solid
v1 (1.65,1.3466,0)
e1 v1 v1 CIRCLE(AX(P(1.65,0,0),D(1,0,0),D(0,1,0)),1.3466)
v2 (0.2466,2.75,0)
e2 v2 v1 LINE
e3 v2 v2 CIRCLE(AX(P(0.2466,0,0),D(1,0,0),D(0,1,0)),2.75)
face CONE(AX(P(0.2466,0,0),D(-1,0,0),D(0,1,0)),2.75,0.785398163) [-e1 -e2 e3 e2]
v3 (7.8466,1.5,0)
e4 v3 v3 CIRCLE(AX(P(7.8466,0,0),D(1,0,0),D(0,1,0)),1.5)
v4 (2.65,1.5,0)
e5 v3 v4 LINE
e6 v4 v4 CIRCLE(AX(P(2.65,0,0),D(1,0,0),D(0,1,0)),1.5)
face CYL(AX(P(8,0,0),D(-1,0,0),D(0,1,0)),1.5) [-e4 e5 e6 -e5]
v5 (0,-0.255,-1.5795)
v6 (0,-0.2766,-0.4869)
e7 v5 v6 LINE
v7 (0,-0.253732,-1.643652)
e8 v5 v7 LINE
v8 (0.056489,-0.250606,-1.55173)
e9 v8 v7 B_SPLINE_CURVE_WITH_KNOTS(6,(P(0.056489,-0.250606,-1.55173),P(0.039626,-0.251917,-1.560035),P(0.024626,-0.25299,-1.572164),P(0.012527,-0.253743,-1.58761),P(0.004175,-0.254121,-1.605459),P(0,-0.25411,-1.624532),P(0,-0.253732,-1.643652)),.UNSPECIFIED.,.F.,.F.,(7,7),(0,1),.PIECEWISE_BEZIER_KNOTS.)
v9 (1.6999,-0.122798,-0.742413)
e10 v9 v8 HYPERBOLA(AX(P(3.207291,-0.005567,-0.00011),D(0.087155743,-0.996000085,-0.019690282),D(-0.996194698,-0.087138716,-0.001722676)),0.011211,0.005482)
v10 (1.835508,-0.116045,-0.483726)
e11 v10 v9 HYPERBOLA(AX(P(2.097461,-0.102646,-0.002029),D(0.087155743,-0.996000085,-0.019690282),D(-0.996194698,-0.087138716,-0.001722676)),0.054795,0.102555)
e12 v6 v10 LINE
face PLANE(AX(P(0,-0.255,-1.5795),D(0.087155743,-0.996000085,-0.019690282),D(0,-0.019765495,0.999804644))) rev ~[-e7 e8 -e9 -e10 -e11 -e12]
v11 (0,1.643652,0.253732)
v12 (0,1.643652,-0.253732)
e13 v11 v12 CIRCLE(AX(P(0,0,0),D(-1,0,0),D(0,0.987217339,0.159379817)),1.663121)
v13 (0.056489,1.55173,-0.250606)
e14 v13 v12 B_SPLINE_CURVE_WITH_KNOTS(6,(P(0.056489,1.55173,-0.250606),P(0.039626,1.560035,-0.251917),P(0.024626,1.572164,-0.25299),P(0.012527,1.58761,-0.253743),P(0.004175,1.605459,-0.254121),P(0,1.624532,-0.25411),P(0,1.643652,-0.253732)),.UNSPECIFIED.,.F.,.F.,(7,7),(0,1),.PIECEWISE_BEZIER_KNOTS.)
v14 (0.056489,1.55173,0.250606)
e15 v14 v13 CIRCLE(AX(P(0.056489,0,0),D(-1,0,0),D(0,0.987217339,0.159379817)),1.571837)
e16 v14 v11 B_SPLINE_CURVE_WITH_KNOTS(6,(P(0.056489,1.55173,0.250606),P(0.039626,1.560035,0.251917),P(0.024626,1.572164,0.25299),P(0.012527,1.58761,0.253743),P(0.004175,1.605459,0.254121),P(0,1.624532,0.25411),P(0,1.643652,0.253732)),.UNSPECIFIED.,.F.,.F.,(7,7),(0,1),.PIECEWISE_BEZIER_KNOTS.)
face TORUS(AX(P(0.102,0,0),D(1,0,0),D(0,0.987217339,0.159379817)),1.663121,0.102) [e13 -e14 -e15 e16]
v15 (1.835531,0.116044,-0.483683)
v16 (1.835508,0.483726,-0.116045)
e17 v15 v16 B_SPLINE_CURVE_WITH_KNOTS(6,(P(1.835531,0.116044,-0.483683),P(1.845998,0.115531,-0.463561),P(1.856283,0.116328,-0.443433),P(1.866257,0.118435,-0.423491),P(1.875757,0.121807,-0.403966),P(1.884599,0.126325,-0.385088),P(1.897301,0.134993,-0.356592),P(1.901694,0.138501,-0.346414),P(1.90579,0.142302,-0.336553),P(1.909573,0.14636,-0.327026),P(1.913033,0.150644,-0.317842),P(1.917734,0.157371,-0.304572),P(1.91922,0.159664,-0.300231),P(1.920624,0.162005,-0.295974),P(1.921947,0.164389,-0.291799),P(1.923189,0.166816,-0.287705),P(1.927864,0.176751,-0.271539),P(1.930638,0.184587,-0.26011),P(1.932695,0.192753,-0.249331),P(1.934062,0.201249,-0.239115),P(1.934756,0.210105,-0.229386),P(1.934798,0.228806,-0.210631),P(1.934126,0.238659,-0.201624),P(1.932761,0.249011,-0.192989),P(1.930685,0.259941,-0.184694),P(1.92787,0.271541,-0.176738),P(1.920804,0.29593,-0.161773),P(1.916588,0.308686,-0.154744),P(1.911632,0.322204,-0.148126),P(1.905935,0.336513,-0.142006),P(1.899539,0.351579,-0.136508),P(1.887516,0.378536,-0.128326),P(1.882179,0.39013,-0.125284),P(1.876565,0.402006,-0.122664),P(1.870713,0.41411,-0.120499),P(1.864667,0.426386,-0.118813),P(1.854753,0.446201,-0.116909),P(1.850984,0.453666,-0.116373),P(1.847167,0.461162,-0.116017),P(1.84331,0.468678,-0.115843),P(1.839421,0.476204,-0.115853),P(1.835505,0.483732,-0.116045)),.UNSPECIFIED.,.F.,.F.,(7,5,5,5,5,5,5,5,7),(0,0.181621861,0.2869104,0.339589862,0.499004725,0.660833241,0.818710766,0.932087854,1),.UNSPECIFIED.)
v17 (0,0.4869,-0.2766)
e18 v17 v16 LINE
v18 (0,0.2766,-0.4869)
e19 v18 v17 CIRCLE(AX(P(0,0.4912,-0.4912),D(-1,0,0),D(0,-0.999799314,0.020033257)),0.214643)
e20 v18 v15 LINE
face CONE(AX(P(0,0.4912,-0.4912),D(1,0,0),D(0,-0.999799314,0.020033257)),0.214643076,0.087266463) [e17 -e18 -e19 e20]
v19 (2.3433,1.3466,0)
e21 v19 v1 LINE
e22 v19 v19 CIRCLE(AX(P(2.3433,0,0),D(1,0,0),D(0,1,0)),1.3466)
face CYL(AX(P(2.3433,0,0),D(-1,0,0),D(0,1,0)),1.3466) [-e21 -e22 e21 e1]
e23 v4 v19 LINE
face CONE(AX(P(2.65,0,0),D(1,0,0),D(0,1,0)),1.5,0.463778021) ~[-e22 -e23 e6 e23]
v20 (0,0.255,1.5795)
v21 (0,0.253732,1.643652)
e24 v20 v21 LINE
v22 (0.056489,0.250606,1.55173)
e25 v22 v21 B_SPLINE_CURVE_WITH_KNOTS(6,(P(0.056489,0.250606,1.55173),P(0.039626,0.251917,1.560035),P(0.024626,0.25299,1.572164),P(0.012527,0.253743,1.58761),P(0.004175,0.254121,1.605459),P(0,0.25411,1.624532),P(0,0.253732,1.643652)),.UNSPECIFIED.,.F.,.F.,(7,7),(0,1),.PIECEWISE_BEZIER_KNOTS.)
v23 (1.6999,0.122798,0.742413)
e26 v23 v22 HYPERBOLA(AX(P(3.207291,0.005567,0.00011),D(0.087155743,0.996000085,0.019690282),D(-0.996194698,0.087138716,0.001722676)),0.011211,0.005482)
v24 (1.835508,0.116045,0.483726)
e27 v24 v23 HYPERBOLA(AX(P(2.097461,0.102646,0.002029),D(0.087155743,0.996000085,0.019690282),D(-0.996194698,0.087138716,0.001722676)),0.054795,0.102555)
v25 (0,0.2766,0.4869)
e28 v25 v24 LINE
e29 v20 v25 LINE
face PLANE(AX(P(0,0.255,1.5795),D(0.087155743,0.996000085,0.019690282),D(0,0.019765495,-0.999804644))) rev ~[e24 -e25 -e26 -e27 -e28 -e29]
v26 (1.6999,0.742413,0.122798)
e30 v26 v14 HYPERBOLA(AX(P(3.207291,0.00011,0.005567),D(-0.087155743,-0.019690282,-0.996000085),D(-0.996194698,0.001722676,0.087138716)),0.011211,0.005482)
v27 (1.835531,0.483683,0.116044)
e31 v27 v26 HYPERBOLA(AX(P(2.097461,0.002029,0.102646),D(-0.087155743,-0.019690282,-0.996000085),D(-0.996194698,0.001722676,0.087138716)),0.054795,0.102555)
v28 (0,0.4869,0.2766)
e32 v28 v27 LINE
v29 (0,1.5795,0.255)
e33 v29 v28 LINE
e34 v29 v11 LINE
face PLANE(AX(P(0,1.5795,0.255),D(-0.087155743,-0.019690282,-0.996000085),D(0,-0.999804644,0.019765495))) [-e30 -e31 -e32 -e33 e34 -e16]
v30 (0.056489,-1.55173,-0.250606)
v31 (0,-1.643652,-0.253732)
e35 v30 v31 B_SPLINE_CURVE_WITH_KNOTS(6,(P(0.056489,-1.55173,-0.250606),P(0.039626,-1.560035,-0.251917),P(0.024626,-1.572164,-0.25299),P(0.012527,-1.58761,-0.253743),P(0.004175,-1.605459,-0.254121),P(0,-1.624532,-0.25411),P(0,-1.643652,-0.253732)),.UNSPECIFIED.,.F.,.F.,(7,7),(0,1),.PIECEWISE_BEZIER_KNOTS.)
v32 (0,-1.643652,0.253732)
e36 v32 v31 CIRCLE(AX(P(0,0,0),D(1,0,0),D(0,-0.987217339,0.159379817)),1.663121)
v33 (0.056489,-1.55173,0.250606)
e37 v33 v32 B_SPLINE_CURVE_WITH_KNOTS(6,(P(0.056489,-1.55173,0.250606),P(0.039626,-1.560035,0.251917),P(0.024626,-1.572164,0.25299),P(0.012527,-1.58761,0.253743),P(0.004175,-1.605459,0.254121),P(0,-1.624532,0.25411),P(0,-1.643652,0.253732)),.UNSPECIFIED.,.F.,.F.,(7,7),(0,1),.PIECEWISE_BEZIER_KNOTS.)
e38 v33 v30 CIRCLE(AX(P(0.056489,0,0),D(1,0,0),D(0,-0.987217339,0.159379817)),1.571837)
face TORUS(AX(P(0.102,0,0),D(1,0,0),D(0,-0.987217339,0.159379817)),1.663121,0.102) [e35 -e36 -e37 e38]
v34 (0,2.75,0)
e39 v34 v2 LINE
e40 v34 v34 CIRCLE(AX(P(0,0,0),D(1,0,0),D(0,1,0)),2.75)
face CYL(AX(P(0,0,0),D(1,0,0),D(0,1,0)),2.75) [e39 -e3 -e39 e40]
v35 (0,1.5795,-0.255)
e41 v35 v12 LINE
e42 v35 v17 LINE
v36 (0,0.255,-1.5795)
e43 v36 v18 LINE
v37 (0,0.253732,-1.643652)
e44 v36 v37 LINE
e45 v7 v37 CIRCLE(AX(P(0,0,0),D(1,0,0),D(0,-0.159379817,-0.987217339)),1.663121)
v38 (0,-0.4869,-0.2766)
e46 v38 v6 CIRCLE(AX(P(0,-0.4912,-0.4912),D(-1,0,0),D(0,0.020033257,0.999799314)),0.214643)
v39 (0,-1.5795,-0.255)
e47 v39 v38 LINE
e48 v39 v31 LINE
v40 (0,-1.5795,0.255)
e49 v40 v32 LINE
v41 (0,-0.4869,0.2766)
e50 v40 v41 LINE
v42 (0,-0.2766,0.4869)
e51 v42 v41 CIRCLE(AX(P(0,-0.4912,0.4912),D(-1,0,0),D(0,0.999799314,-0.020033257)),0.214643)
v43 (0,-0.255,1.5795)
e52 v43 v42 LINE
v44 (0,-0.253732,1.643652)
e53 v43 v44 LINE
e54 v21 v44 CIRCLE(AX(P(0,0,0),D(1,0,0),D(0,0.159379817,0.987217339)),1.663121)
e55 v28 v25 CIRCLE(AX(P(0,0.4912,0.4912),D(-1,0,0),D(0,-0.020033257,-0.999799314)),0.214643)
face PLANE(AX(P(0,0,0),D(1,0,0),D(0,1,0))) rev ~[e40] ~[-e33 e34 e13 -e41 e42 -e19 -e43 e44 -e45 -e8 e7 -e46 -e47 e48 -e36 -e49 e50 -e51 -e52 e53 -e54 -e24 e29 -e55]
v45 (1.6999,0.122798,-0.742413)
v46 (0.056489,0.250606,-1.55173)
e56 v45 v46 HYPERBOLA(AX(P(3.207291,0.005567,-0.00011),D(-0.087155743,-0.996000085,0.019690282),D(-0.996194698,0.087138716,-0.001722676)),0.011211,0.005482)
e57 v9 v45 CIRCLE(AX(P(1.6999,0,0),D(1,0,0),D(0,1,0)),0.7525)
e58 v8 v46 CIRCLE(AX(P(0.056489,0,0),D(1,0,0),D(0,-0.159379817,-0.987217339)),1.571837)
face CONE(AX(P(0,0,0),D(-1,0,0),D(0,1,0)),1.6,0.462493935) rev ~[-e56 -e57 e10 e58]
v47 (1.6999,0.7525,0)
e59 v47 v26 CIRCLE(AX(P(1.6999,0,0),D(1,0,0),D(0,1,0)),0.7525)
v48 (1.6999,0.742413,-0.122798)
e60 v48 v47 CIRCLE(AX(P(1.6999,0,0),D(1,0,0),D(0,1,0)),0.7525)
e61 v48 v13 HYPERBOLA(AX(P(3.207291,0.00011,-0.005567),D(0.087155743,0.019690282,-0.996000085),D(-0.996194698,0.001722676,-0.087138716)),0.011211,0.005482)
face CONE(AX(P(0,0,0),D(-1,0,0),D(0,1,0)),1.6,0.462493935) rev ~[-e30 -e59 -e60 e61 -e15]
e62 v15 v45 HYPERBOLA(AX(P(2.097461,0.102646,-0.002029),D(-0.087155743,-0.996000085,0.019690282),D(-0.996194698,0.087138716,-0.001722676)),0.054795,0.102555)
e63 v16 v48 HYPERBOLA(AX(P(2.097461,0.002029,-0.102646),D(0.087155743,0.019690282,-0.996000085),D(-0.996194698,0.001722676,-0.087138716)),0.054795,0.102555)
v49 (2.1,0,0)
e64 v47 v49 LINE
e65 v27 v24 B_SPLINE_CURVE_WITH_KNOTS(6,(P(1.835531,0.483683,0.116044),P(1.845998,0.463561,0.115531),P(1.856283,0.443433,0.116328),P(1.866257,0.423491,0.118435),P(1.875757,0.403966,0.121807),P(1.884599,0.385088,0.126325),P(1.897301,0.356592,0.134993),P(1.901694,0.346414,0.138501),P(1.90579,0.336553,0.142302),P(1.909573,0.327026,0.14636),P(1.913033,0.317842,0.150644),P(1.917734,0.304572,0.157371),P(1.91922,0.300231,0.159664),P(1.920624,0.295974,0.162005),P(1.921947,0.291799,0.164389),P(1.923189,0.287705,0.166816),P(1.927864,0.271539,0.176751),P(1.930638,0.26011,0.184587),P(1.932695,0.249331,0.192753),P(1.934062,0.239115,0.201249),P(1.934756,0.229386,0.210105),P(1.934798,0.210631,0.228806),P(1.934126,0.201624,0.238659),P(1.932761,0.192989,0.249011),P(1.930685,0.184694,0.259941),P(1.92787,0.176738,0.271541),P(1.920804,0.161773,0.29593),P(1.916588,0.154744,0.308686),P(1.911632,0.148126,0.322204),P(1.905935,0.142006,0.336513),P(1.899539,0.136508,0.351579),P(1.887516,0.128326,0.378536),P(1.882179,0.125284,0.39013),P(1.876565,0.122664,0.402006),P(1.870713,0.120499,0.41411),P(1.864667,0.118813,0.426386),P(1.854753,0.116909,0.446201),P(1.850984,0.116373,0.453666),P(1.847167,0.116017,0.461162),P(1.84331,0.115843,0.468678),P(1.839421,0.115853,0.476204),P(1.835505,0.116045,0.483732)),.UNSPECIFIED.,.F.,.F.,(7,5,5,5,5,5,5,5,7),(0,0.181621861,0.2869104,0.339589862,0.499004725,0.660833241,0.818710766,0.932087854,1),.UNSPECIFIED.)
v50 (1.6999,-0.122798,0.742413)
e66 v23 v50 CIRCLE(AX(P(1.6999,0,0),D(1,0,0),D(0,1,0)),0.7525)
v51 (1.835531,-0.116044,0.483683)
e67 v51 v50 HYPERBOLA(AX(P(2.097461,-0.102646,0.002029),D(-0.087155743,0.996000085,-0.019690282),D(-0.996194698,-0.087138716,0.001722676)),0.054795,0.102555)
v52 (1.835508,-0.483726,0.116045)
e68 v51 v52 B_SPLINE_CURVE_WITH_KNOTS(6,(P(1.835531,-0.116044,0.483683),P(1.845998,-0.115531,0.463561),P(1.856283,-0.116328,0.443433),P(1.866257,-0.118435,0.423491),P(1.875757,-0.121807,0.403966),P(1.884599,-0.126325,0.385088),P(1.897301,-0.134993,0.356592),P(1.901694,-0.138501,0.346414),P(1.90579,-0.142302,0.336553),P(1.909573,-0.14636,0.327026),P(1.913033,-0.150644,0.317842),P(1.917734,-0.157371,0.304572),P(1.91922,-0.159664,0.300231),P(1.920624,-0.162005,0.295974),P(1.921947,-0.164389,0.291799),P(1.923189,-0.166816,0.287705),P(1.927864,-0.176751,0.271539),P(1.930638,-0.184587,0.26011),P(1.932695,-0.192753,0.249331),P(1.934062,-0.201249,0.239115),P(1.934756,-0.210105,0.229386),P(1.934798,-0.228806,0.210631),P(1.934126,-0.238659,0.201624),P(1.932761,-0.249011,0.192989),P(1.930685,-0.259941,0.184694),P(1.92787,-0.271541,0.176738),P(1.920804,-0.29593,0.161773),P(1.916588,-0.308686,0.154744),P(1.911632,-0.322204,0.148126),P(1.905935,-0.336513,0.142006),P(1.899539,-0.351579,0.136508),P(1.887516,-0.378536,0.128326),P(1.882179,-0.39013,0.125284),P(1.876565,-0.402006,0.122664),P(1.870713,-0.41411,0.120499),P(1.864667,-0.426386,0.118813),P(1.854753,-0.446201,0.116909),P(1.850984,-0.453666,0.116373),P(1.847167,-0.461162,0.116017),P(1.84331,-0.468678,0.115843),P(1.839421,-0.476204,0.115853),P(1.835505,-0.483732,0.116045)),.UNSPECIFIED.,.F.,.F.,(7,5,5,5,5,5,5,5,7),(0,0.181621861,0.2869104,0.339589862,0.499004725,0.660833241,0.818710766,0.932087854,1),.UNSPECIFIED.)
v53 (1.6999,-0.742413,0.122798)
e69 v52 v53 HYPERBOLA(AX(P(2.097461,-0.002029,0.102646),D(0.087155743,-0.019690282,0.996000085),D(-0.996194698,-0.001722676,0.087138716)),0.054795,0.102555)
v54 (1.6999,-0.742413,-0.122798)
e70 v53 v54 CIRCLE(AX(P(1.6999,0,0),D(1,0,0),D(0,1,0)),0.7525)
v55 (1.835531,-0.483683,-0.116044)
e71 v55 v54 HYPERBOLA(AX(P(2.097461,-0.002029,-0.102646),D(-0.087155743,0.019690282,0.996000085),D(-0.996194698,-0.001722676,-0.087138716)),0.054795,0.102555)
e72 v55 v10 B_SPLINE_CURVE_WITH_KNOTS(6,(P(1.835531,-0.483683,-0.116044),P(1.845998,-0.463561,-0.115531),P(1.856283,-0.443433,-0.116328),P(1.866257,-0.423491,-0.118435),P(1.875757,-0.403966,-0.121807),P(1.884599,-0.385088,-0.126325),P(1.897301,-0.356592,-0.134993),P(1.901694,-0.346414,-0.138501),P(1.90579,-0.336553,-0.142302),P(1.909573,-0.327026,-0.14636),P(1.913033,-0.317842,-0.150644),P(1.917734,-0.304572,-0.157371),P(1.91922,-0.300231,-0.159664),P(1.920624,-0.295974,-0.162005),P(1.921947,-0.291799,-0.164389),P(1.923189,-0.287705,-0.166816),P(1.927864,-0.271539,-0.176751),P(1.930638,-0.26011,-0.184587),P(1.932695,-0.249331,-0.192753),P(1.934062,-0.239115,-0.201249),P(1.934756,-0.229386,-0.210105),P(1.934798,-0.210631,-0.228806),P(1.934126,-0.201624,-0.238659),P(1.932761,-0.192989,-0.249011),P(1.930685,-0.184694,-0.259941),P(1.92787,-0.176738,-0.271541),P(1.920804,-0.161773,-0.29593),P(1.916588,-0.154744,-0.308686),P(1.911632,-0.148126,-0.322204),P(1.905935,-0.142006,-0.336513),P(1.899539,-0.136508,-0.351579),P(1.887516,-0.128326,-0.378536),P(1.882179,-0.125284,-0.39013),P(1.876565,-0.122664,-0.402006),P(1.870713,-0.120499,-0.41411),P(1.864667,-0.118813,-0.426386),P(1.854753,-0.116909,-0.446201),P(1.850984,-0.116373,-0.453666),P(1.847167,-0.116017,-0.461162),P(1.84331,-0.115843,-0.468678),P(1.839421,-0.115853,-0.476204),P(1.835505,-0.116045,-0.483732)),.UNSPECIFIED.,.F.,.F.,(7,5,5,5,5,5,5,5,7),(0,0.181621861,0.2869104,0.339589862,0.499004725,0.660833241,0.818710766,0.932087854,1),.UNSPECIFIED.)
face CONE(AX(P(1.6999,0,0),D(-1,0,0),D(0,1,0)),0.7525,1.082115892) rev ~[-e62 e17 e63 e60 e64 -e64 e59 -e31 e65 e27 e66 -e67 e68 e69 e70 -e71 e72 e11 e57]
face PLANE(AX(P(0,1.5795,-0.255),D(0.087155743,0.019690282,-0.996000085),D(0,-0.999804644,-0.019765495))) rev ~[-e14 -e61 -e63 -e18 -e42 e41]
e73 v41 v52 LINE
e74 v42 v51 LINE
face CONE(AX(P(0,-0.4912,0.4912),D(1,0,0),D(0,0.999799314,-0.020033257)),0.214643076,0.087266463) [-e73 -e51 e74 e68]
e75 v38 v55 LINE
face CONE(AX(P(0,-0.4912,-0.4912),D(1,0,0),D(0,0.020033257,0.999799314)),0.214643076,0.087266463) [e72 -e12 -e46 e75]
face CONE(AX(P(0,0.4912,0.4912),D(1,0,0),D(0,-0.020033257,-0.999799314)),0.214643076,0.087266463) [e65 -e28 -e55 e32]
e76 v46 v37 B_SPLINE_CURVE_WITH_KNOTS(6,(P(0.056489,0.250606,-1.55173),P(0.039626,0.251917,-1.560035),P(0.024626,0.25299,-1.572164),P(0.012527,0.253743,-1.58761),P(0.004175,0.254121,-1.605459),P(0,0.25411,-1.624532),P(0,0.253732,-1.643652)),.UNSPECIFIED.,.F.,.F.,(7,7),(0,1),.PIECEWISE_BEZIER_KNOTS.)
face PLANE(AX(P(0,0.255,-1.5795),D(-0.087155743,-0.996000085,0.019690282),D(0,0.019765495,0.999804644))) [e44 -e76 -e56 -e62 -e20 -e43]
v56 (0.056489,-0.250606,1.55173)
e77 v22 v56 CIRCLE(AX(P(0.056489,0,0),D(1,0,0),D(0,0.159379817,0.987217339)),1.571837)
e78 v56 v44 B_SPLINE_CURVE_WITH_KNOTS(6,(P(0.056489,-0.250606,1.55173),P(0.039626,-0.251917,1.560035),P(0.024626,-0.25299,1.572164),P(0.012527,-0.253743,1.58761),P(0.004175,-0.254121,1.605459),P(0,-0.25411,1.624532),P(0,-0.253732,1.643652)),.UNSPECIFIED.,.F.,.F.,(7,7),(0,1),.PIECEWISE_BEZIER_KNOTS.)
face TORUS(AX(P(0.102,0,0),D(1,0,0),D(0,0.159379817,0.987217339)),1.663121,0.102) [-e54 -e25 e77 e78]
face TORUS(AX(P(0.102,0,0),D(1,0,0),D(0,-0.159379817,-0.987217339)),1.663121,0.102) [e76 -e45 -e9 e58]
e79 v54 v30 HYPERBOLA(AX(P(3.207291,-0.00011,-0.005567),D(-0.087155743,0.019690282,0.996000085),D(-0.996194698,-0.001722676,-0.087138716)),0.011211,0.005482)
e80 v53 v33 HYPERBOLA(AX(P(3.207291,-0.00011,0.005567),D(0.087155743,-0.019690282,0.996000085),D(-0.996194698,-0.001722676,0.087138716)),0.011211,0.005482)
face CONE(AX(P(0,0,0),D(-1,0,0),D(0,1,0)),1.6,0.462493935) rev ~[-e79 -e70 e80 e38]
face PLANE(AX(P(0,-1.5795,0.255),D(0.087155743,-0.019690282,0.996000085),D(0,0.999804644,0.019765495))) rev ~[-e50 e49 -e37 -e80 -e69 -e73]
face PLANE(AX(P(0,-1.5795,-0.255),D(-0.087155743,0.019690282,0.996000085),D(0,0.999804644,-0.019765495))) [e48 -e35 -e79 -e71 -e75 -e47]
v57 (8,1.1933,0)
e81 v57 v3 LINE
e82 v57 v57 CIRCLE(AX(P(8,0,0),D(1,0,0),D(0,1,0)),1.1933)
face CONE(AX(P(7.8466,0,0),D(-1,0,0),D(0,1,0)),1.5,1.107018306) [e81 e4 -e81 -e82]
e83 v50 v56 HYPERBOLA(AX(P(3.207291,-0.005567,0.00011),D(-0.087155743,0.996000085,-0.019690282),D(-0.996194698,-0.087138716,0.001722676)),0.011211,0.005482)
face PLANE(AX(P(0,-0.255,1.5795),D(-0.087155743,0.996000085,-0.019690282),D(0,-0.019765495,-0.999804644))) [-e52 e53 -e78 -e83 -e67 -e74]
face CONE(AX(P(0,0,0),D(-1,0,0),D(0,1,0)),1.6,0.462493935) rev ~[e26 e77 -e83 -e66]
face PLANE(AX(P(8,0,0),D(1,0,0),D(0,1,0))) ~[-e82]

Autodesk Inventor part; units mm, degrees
ref_plane "YZ Plane" through (0, 0, 0) normal (1, 0, 0) x (0, 1, 0)
ref_plane "XZ Plane" through (0, 0, 0) normal (0, 1, 0) x (-1, 0, 0)
sketch "Esquisse1" plane through (0, 0, 0) normal (0, 0, 1) x (1, 0, 0)
  line L0 (2.1, 0) -> (8, 0)
  line L1 (8, 0) -> (8, 1.5)
  line L2 (8, 1.5) -> (2.65, 1.5)
  line L3 (2.65, 1.5) -> (2.3433, 1.3466)
  line L4 (2.3433, 1.3466) -> (1.65, 1.3466)
  line L5 (0, 2.75) -> (0, 1.6)
  line L6 (0, 1.6) -> (1.6999, 0.7525)
  line L7 (1.6999, 0.7525) -> (2.1, 0)
  line L8 (-1.6, 0) -> (9.6, 0) projected
  line L9 (0, -0.55) -> (0, 3.3) projected
  line L10 (0, 2.75) -> (0.2466, 2.75)
  line L11 (0.2466, 2.75) -> (1.65, 1.3466)
  line L12 (2.65, 1.5) -> (1.4966, 1.5) construction
  dimension "d1" = 5.35
  dimension "d2" = 3
  dimension "d3" = 2.6933
  dimension "d4" = 3.2
  dimension "d5" = 26.5
  dimension "d6" = 62
  dimension "d7" = 2.1
  dimension "d8" = 0.3067
  dimension "d12" = 5.5
  dimension "d13" = 45
  dimension "d15" = 8
  dimension "d24" = 1.65
revolve "Corps" add sketch "Esquisse1" angle 360 about axis through (2.1, 0, 0) along (1, 0, 0) contours L7 L6 L5 L10 L11 L4 L3 L2 L1 L0
sketch "Esquisse2" plane through (0, 0, 0) normal (-1, 0, 0) x (0, 0, 1)
  line L0 (0, 1.6) -> (0, 0) construction
  line L1 (0, 0) -> (1.6, 0) construction
  arc A0 (0.48, 0) -> (0, 0.48) centre (0, 0) ccw construction
  arc A1 (0.56, 0) -> (0, 0.56) centre (0, 0) ccw construction
  arc A2 (1.5795, 0.255) -> (0.255, 1.5795) centre (0, 0) ccw
  line L2 (0, 0) -> (1.1314, 1.1314) construction
  line L3 (0.255, 1.5795) -> (0.2766, 0.4869)
  line L4 (1.5795, 0.255) -> (0.4869, 0.2766)
  arc A3 (0.255, 1.5795) -> (0, 1.6) centre (0, 0) ccw
  arc A4 (1.6, 0) -> (1.5795, 0.255) centre (0, 0) ccw
  line L5 (0, -3.85) -> (0, 3.85) projected
  line L6 (-3.85, 0) -> (3.85, 0) projected
  arc A5 (0.255, -1.5795) -> (1.5795, -0.255) centre (0, 0) ccw
  line L7 (0.255, -1.5795) -> (0.2766, -0.4869)
  line L8 (1.5795, -0.255) -> (0.4869, -0.2766)
  arc A6 (0, -1.6) -> (0.255, -1.5795) centre (0, 0) ccw
  arc A7 (1.5795, -0.255) -> (1.6, 0) centre (0, 0) ccw
  arc A8 (-0.255, 1.5795) -> (-1.5795, 0.255) centre (0, 0) ccw
  line L9 (-0.255, 1.5795) -> (-0.2766, 0.4869)
  line L10 (-1.5795, 0.255) -> (-0.4869, 0.2766)
  arc A9 (0, 1.6) -> (-0.255, 1.5795) centre (0, 0) ccw
  arc A10 (-1.5795, 0.255) -> (-1.6, 0) centre (0, 0) ccw
  arc A11 (-0.255, -1.5795) -> (0, -1.6) centre (0, 0) ccw
  arc A12 (-1.5795, -0.255) -> (-0.255, -1.5795) centre (0, 0) ccw
  arc A13 (-1.6, 0) -> (-1.5795, -0.255) centre (0, 0) ccw
  line L11 (-1.5795, -0.255) -> (-0.4869, -0.2766)
  line L12 (-0.255, -1.5795) -> (-0.2766, -0.4869)
  arc A14 (0.2766, 0.4869) -> (0.4869, 0.2766) centre (0.4912, 0.4912) ccw
  arc A15 (0.4869, -0.2766) -> (0.2766, -0.4869) centre (0.4912, -0.4912) ccw
  arc A16 (-0.4869, 0.2766) -> (-0.2766, 0.4869) centre (-0.4912, 0.4912) ccw
  arc A17 (-0.2766, -0.4869) -> (-0.4869, -0.2766) centre (-0.4912, -0.4912) ccw
  point P0 (1.1314, -1.1314)
  point P1 (-1.1314, 1.1314)
  point P2 (-1.1314, -1.1314)
  dimension "d17" = 0.96
  dimension "d18" = 1.12
  dimension "d19" = 3.2
  dimension "d20" = 45
  dimension "d21" = 0.255
extrude "Rainure" add sketch "Esquisse2" against normal up to next draft 5 contours L4 A14 L3 A2 | A5 L7 A15 L8 | L9 A16 L10 A8 | A12 L11 A17 L12
fillet "Congé1" radius 0.102 4 edges at (0, 1.6, 0) (0, 0, -1.6) (0, -1.6, 0) (0, 0, 1.6)
thread "Filetage" size "M3x0.5" class "6g" standard "ISO Metric profile" length 5.35
chamfer "Chanfrein1" distance 0.3067 distance2 0.1534 1 edges at (8, -1.5, 0) measured on face at (8, 0.3888, 0.4512)
ref_plane "Work Plane2" through (3.35, 0, 0) normal (0, 0, -1) x (1, 0, 0)
equation "\"d1\" = GEL"
equation "\"d2\" = GD"
equation "\"d3\" = BDM"
equation "\"d4\" = SDM"
equation "\"d7\" = INTI"
equation "\"d8\" = GAL"
equation "\"d12\" = KOD"
equation "\"d13\" = 0.5 * SEWI"
equation "\"d15\" = NLG"
equation "\"d24\" = KOH"
equation "\"d17\" = 0.3 * SDM"
equation "\"d18\" = 0.35 * SDM"
equation "\"d19\" = SDM"
equation "\"d21\" = 0.5 * SBR"
equation "\"d23\" = 0.2 * SBR"
equation "\"d10\" = GEL"
equation "\"d25\" = -0.5 * SPD + 0.5 * GD"
equation "\"d26\" = 0.5 * GAL"
equation "\"NLG\" = 8"
equation "\"GEL\" = 5.35"
equation "\"GAL\" = 0.61345 * PTC"
equation "\"SPD\" = NND - 1.2269 * PTC"
equation "\"KOD\" = 5.5"
equation "\"KOH\" = 1.65"
equation "\"SBR\" = 0.51"
equation "\"INTI\" = 2.1"
equation "\"SDM\" = 3.2"
equation "\"GD\" = NND"
equation "\"BDM\" = NND - GAL"
equation "\"SEWI\" = 90deg"
equation "\"d9\" = SDM"
equation "\"GUL\" = 0.61345 * PTC"
equation "\"TOA\" = 30deg"
equation "\"EPV\" = 3.15"
equation "\"THREADDIA\" = 3"
equation "\"PTC\" = 0.5"
equation "\"NND\" = 3"
equation "\"GD1\" = THREADDIA - 1.2269 * PTC"
properties part number "ISO 7046-1 - M3 x 8 - 4.8 - H" material "Acier"
